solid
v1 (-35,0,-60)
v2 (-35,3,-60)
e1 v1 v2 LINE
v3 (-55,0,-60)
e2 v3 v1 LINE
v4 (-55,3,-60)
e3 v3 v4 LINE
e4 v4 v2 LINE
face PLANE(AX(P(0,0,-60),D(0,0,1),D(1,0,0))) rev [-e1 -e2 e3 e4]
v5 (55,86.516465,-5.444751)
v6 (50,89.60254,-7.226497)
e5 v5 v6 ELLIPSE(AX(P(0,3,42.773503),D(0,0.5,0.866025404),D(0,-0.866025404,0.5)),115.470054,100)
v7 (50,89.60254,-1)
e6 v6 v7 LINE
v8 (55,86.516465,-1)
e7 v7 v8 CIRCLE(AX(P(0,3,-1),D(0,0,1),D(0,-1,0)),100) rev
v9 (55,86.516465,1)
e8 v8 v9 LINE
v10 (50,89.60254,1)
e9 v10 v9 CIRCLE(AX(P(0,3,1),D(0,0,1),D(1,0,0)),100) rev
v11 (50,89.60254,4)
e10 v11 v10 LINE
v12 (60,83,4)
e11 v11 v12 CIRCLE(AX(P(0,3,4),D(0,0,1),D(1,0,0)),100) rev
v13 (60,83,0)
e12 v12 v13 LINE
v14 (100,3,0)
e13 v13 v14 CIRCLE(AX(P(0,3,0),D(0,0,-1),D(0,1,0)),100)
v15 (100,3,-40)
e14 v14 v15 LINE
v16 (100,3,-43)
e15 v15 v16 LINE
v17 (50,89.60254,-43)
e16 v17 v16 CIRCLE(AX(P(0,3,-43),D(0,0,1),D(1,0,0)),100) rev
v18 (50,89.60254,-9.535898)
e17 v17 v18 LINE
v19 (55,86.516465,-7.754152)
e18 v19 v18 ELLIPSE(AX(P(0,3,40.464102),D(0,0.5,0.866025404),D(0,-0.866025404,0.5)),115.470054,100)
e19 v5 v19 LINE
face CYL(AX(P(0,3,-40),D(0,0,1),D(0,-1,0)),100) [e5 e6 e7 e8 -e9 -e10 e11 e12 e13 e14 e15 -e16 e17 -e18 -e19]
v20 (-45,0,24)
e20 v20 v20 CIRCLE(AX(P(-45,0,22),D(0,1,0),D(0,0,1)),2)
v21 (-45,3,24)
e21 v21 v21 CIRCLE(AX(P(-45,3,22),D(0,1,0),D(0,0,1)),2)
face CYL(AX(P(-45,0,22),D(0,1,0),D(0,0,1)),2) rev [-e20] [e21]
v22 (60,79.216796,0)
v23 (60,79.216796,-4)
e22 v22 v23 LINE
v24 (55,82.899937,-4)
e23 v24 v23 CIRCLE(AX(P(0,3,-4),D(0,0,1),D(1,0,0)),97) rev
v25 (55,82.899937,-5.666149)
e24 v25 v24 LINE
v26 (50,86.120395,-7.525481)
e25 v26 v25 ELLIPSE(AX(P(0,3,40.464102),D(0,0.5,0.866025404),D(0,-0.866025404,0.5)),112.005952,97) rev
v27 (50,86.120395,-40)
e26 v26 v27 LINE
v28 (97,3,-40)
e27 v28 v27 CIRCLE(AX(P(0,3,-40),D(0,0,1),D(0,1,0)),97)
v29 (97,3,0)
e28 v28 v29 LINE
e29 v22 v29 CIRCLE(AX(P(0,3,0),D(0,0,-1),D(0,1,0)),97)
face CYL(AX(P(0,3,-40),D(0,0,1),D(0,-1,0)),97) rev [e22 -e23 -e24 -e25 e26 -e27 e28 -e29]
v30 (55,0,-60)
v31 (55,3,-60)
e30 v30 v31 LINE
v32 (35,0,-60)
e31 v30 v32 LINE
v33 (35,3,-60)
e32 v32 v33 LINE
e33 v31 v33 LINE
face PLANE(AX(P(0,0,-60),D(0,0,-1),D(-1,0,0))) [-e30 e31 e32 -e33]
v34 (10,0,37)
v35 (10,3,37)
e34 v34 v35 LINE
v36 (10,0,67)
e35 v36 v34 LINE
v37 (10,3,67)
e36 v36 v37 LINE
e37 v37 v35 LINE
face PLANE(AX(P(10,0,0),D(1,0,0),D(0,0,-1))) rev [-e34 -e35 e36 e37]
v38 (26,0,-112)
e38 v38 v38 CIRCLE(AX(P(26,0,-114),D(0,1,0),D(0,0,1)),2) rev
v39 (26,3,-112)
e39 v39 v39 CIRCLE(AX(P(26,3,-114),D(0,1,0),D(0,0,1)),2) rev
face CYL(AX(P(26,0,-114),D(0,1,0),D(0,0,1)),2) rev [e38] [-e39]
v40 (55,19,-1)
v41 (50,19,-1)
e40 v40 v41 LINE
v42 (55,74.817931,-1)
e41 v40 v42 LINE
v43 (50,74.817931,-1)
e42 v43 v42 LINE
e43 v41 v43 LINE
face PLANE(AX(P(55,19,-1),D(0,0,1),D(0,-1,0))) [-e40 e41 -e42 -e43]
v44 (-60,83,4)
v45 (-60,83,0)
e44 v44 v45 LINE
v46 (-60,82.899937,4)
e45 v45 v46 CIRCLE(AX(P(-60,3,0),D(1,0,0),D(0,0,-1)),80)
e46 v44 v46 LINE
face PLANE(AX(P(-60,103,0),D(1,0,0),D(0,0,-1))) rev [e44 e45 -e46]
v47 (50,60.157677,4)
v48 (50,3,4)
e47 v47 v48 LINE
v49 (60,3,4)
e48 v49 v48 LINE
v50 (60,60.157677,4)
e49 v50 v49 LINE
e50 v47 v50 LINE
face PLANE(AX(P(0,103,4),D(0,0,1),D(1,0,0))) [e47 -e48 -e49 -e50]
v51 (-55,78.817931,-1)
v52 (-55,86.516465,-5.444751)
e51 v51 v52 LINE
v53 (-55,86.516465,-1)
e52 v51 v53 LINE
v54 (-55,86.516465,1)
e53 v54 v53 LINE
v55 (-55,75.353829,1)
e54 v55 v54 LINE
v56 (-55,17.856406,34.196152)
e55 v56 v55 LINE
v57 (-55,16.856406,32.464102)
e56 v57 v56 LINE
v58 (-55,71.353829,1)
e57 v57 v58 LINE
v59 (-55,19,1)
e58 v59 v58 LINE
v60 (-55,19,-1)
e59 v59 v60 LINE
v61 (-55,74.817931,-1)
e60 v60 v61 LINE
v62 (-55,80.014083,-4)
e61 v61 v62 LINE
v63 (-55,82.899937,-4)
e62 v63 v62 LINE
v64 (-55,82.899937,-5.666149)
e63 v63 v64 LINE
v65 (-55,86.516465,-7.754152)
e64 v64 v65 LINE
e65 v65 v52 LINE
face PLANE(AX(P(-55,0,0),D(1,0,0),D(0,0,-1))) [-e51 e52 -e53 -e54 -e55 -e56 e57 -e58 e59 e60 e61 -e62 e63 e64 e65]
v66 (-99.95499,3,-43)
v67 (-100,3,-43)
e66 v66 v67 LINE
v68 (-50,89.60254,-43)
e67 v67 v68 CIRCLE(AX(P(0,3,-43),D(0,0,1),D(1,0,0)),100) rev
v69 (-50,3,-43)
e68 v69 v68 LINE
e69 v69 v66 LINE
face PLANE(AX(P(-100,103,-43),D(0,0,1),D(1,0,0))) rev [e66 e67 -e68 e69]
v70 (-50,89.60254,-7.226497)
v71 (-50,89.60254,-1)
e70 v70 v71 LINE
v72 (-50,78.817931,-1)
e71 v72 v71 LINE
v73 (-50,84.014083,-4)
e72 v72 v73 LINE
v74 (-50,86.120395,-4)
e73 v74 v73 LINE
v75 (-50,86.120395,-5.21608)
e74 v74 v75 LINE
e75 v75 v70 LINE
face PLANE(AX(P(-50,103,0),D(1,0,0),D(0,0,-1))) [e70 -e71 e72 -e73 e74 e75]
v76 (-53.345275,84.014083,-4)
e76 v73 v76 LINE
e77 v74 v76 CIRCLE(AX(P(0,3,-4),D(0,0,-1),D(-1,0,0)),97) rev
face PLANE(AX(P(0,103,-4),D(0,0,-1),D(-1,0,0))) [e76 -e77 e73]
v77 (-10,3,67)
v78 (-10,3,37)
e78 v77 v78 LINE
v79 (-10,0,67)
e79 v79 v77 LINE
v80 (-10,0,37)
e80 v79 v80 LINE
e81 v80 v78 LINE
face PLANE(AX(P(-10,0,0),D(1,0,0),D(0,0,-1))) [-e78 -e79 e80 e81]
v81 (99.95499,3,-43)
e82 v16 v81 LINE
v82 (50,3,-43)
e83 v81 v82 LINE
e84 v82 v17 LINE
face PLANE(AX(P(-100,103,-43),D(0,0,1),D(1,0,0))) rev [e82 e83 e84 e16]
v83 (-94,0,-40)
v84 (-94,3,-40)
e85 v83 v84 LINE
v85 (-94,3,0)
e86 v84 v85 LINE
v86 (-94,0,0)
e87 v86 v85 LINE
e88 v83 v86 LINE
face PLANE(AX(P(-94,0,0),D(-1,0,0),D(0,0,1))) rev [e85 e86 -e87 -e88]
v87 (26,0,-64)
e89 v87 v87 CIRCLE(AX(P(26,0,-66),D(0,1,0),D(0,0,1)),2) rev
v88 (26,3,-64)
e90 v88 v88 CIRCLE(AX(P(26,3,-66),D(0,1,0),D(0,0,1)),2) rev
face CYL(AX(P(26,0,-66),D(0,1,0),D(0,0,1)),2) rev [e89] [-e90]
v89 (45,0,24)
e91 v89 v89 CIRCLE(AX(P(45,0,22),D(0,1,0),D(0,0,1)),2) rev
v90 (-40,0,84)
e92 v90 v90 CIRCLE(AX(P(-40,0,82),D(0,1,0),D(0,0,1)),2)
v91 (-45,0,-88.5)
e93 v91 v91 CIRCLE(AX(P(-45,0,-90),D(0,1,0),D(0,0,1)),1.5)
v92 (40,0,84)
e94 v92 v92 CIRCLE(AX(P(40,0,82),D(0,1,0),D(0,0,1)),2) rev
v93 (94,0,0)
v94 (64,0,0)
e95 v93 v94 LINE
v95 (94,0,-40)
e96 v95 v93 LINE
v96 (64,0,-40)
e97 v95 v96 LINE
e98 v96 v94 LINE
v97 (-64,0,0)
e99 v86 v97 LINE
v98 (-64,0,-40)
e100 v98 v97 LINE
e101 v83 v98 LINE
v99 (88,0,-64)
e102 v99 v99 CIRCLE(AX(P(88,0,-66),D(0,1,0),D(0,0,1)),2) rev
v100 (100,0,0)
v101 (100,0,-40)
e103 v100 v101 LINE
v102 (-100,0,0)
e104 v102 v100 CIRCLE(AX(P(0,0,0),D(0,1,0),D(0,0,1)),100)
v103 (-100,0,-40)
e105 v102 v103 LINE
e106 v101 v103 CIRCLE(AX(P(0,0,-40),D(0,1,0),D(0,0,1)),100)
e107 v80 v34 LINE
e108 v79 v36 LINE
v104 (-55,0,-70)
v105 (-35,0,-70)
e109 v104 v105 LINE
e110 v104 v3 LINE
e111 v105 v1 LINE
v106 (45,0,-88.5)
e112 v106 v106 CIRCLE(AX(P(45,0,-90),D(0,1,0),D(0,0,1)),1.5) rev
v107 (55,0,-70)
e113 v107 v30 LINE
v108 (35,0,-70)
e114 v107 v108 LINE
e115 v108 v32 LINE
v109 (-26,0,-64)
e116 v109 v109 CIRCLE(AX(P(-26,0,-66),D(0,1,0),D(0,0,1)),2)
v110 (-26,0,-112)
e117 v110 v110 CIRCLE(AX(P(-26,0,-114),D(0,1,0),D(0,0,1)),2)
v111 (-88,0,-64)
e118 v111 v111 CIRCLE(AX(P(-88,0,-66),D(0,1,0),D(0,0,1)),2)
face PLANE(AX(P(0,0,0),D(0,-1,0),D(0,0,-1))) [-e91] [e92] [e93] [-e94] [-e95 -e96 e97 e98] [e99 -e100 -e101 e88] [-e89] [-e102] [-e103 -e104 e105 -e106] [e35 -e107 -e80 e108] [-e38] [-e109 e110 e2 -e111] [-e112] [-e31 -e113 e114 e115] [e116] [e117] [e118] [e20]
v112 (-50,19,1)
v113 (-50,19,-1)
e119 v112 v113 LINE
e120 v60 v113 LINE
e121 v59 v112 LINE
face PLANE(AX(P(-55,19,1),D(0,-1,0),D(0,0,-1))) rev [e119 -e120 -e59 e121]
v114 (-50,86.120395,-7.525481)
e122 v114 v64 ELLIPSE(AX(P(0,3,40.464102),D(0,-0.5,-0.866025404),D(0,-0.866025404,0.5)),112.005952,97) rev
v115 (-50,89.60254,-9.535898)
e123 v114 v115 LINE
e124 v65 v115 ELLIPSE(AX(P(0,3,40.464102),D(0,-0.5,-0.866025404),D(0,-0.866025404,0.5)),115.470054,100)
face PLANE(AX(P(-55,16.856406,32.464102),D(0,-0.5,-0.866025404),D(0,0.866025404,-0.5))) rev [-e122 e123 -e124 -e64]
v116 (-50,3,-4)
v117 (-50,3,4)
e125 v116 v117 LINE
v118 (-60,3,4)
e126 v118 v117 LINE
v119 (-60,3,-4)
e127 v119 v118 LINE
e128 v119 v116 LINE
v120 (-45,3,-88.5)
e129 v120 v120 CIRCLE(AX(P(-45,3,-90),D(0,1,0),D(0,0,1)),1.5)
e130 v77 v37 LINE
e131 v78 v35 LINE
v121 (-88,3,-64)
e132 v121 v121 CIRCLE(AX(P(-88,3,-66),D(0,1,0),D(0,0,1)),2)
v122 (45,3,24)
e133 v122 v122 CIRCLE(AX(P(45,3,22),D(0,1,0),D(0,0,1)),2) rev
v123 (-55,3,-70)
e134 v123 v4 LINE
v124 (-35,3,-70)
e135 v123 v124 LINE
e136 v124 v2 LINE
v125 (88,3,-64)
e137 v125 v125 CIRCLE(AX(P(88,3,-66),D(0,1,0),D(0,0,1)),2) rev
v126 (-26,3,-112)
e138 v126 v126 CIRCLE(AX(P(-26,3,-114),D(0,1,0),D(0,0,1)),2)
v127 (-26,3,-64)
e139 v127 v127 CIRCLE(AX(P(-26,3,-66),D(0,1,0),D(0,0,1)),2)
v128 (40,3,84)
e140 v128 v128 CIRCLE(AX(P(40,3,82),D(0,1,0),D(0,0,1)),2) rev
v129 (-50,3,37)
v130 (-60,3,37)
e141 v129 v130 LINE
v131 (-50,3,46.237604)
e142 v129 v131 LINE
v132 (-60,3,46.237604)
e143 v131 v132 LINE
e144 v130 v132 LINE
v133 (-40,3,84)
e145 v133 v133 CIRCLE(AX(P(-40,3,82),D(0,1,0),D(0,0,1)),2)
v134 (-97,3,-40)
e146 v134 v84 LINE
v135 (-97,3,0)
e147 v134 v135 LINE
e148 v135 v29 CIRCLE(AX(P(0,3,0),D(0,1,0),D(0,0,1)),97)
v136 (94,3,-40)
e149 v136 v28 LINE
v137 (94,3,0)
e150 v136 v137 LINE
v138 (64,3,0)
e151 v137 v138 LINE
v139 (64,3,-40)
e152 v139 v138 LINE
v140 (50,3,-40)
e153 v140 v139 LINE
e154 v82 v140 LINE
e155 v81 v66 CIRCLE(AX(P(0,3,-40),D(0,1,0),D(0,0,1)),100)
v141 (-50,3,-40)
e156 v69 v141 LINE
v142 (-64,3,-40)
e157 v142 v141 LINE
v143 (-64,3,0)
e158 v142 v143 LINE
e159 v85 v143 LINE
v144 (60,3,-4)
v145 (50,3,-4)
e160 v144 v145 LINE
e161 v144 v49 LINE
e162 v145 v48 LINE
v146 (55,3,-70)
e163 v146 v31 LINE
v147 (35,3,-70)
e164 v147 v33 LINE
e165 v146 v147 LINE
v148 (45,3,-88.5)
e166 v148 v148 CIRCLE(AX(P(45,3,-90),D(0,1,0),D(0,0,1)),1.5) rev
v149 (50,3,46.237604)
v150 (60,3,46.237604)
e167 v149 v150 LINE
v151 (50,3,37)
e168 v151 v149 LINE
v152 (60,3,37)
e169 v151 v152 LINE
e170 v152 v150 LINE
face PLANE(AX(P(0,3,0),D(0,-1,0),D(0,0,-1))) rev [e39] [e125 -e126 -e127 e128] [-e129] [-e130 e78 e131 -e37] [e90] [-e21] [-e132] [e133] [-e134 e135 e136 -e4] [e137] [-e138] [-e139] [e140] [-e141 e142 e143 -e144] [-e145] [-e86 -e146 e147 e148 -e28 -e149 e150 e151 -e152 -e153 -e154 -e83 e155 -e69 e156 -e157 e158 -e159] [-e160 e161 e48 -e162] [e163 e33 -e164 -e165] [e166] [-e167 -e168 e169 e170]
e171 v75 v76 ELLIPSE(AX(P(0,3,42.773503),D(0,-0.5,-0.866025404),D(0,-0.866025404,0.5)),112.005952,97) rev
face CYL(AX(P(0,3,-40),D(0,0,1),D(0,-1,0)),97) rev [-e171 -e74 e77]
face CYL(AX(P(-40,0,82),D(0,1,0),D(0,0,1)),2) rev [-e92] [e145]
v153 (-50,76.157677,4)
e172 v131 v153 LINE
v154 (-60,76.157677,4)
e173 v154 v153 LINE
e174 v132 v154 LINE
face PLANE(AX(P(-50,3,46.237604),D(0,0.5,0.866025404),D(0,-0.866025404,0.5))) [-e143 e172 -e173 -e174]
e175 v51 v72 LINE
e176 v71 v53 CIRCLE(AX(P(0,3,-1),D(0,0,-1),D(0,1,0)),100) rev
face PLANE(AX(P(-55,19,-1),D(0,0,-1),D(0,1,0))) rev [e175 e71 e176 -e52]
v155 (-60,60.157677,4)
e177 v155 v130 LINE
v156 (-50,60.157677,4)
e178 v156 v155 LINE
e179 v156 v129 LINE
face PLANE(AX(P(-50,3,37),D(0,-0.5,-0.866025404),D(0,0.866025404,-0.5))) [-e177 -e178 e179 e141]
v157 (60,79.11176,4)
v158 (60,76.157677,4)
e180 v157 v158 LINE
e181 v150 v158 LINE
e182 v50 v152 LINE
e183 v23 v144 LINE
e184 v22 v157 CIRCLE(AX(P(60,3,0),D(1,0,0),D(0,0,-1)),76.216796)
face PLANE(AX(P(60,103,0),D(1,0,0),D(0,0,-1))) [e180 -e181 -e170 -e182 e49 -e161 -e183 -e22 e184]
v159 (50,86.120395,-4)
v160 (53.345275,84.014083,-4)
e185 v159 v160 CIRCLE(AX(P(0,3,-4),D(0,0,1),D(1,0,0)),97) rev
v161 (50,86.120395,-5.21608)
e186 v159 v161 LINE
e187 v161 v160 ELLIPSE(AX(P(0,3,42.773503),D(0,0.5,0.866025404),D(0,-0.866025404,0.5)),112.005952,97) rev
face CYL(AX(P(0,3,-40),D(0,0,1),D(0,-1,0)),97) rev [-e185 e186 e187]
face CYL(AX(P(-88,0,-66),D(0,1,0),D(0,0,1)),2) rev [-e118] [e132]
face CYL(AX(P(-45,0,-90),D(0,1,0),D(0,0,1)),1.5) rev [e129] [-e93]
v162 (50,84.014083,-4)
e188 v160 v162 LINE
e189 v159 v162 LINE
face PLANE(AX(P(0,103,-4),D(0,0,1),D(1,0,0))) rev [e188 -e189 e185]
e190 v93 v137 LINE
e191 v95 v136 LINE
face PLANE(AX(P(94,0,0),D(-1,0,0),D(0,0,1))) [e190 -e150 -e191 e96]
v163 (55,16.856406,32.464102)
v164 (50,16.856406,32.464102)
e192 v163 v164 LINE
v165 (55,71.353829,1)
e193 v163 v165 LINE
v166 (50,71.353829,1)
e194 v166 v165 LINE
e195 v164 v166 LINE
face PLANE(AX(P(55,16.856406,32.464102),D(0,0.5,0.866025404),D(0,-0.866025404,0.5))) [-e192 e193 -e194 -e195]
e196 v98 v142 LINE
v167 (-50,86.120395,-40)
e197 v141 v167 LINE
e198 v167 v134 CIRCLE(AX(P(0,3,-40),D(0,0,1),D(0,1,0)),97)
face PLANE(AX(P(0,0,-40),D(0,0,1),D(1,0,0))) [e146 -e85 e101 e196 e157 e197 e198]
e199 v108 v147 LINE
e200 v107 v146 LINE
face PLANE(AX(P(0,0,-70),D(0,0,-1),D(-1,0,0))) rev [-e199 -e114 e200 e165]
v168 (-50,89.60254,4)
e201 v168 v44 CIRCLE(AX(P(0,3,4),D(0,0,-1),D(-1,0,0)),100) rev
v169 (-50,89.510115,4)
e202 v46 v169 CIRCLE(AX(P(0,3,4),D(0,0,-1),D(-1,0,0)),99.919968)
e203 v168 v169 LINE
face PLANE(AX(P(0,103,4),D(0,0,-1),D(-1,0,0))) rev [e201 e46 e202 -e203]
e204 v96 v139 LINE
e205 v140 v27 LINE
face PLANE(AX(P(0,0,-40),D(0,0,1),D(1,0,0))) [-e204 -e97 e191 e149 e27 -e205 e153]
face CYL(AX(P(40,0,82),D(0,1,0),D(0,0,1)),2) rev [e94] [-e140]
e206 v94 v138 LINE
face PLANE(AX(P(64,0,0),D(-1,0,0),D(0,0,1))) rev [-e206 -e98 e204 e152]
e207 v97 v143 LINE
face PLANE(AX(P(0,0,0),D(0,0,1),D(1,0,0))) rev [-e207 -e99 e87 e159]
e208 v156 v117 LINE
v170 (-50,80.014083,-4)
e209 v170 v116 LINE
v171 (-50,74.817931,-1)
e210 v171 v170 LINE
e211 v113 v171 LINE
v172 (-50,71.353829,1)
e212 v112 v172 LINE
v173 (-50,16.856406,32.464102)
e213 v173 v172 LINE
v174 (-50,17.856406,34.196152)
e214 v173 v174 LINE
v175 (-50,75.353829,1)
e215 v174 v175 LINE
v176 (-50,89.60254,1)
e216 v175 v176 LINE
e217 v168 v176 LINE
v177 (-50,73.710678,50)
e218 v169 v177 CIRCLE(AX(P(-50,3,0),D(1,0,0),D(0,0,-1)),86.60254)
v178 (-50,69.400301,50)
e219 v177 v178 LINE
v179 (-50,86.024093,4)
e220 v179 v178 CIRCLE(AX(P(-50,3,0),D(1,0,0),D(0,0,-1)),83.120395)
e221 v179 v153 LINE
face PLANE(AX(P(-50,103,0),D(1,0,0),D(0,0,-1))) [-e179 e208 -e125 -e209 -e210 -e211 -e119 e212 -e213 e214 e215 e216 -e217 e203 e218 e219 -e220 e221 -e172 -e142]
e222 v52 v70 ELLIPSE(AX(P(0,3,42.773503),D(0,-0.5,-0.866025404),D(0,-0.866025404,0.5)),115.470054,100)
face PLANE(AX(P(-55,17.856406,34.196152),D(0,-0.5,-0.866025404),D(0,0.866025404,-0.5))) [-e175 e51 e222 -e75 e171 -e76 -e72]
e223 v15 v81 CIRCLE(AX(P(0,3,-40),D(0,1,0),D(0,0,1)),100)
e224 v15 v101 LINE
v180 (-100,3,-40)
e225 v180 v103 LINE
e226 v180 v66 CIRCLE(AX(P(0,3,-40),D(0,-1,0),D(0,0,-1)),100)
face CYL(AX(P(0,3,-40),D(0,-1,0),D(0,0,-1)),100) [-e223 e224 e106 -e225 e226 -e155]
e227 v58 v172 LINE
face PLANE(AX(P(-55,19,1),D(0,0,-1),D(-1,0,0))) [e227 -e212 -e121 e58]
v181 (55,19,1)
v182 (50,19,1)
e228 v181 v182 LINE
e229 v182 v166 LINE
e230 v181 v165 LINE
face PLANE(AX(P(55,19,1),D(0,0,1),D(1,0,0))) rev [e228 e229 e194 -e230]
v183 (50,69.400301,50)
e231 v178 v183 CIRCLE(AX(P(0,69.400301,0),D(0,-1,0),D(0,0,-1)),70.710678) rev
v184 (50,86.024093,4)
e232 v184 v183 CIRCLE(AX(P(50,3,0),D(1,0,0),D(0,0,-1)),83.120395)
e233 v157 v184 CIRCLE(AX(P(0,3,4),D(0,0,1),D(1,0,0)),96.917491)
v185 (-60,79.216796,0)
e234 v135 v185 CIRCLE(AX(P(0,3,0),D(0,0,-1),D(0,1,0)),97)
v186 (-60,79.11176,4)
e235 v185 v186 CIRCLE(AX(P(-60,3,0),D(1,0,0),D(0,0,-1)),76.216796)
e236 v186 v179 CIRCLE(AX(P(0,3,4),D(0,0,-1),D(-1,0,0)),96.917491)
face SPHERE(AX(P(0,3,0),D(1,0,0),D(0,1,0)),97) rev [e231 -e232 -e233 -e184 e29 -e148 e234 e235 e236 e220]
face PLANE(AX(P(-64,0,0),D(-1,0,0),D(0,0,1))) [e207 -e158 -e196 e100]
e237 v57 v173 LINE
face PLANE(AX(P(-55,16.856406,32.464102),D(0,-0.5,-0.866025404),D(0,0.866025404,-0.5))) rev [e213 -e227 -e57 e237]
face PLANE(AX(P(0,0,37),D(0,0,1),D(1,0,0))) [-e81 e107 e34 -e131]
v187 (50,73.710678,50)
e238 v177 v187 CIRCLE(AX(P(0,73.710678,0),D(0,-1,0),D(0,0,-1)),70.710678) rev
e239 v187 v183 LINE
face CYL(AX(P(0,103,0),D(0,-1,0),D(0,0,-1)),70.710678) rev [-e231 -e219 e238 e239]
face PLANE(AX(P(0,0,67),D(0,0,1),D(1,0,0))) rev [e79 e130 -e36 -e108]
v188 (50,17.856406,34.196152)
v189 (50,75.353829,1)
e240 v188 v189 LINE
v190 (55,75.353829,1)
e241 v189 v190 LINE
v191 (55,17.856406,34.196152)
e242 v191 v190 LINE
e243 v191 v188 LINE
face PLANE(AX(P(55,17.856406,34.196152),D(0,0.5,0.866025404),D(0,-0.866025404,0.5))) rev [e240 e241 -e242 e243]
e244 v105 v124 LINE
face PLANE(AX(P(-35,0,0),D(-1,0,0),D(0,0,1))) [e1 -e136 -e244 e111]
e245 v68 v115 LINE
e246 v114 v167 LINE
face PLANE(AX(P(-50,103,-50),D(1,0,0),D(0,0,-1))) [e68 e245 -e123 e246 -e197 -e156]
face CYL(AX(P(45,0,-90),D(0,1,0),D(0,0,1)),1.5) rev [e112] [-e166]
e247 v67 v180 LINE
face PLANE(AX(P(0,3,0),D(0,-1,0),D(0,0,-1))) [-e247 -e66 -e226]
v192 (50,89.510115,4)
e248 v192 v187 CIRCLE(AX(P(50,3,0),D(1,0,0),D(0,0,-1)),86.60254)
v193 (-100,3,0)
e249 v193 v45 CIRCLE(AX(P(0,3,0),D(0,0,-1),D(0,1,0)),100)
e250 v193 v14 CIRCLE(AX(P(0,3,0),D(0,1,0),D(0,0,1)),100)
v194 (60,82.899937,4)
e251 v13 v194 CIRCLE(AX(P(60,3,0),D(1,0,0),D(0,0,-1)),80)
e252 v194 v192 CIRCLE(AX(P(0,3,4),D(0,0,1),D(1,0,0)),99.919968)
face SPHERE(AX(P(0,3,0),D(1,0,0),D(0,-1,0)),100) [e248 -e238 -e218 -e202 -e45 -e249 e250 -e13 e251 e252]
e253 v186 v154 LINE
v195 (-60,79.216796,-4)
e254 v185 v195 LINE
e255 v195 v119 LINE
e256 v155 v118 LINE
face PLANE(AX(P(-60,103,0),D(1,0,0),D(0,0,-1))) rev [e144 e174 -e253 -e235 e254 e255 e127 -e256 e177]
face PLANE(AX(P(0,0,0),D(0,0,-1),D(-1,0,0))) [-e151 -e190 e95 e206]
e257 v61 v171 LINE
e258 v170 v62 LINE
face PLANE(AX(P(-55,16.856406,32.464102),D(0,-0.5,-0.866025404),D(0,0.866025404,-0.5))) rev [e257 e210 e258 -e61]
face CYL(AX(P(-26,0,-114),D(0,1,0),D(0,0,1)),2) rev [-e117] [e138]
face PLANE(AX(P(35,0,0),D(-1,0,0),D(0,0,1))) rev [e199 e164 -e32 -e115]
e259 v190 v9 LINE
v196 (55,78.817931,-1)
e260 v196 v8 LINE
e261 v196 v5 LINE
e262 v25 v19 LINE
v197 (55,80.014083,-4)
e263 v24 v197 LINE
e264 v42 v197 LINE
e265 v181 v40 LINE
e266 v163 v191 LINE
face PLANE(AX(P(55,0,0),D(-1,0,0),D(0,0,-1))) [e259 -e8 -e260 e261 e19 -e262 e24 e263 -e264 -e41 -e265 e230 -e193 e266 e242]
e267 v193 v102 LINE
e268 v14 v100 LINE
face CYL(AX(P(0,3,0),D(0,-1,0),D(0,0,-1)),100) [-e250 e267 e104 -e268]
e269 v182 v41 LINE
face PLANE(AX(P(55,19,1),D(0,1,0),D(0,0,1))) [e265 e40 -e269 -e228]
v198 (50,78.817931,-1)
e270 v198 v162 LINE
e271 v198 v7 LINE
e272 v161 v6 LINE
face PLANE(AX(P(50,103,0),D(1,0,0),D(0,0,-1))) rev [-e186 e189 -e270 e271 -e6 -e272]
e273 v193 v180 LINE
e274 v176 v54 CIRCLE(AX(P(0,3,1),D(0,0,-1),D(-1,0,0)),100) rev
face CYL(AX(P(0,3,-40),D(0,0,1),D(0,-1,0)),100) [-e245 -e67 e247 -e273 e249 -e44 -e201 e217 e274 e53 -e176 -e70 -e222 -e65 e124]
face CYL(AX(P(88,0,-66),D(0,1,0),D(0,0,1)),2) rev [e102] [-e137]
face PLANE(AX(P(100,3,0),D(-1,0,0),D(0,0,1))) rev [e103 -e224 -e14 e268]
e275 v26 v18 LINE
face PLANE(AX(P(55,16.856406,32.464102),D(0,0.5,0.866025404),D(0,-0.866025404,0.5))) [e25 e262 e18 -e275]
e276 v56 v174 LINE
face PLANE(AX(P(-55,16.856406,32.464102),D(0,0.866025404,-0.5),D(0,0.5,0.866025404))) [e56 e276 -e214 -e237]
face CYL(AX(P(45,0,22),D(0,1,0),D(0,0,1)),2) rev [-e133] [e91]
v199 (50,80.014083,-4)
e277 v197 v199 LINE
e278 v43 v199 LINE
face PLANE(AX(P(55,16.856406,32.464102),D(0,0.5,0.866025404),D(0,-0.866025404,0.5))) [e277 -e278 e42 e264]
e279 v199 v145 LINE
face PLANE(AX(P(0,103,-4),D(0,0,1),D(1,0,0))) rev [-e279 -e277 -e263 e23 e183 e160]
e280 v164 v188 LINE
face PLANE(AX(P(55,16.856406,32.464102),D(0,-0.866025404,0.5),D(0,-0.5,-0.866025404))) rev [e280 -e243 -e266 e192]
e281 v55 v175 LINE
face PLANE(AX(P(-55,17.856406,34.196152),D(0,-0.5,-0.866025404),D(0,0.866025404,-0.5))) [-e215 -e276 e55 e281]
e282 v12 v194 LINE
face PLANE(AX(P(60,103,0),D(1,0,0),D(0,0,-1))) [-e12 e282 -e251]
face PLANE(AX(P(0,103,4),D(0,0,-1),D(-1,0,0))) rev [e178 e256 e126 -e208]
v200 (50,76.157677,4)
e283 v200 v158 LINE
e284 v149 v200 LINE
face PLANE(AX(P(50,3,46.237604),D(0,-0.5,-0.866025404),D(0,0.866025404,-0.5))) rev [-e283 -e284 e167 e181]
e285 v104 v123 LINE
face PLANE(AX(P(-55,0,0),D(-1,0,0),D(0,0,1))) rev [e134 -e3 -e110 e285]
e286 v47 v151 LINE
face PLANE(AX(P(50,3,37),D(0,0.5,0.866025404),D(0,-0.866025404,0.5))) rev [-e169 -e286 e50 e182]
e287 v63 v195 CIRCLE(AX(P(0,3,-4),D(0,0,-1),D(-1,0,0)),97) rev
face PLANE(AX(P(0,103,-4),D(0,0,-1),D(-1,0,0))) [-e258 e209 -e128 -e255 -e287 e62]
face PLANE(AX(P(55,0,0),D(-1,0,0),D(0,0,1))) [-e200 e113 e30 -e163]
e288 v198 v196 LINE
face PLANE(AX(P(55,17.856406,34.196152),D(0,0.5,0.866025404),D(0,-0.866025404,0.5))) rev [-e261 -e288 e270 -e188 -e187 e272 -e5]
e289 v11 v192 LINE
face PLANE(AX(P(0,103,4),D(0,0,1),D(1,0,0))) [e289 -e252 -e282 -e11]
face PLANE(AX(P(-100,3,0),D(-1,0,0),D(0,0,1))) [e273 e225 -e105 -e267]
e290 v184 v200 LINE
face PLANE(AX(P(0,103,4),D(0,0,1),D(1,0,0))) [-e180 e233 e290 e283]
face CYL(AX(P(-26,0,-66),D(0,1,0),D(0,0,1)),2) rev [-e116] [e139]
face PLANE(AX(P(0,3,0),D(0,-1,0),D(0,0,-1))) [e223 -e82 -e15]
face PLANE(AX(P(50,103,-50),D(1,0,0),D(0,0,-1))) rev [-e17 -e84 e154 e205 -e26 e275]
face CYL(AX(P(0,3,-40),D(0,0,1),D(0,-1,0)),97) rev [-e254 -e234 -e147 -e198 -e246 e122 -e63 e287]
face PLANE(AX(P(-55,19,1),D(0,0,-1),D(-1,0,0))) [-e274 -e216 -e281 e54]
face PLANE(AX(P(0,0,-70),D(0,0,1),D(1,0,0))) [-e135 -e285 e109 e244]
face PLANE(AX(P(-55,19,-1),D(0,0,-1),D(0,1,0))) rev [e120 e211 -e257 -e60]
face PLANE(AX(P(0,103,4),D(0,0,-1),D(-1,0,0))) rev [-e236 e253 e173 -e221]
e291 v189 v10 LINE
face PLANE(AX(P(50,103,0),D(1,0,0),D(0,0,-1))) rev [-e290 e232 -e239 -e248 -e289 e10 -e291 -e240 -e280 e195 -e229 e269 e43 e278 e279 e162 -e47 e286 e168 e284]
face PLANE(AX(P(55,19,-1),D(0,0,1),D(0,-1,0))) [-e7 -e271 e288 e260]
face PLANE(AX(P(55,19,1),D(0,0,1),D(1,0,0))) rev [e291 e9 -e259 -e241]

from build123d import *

# Parameters (mm, degrees)
SKETCH_1_R                  = 100
SKETCH_1_W                  = 200
SKETCH_1_H                  = 40
EXTRUDE_524_DEPTH           = 3
SKETCH_3_W                  = 30
SKETCH_3_H                  = 40
SKETCH_3_W_2                = 20
SKETCH_3_H_2                = 10
SKETCH_3_H_3                = 30
CUT_EXTRUDE_1393_DEPTH      = 3
SKETCH_2_R                  = 2
SKETCH_2_R_2                = 1.5
CUT_EXTRUDE_2567_DEPTH      = 173.072659072
REVOLVE_3158_ANGLE          = 90
EXTRUDE_3359_DEPTH          = 40
SKETCH_8_W                  = 10
SKETCH_8_H                  = 8
EXTRUDE_L_DEPTH             = 100
EXTRUDE_L_32_DEPTH          = 10
SKETCH_16_W                 = 2
SKETCH_16_H                 = 84
CUT_EXTRUDE_L_DEPTH         = 5
SKETCH_23_W                 = 200
SKETCH_23_H                 = 3
EXTRUDE_5603_DEPTH          = 100
CUT_EXTRUDE_5983_DEPTH      = 100
CUT_EXTRUDE_5983_DEPTH_BACK = 100
CUT_EXTRUDE_6828_DEPTH      = 100


with BuildPart() as part:
    # 草图1 → Extrude 524 (new body)
    with BuildSketch(Plane(origin=(0, 0, 0), x_dir=(1, 0, 0), z_dir=(0, 1, 0))):
        Circle(SKETCH_1_R)
        with Locations((0, 40)):
            Circle(SKETCH_1_R)
        with Locations((0, 20)):
            Rectangle(SKETCH_1_W, SKETCH_1_H)
    extrude(amount=EXTRUDE_524_DEPTH)

    # 草图3 → Cut-Extrude 1393 (cut)
    with BuildSketch(Plane(origin=(0, 3, 0), x_dir=(1, 0, 0), z_dir=(0, 1, 0))):
        with Locations((-79, 20)):
            Rectangle(SKETCH_3_W, SKETCH_3_H)
        with Locations((79, 20)):
            Rectangle(SKETCH_3_W, SKETCH_3_H)
        with Locations((45, 65)):
            Rectangle(SKETCH_3_W_2, SKETCH_3_H_2)
        with Locations((0, -52)):
            Rectangle(SKETCH_3_W_2, SKETCH_3_H_3)
        with Locations((-45, 65)):
            Rectangle(SKETCH_3_W_2, SKETCH_3_H_2)
    extrude(amount=-CUT_EXTRUDE_1393_DEPTH, mode=Mode.SUBTRACT)

    # 草图2 → Cut-Extrude 2567 (cut, through all)
    with BuildSketch(Plane(origin=(0, 3, 0), x_dir=(1, 0, 0), z_dir=(0, 1, 0))):
        with Locations((-45, -22)):
            Circle(SKETCH_2_R)
        with Locations((-40, -82)):
            Circle(SKETCH_2_R)
        with Locations((-88, 66)):
            Circle(SKETCH_2_R)
        with Locations((-26, 66)):
            Circle(SKETCH_2_R)
        with Locations((-26, 114)):
            Circle(SKETCH_2_R)
        with Locations((40, -82)):
            Circle(SKETCH_2_R)
        with Locations((45, -22)):
            Circle(SKETCH_2_R)
        with Locations((26, 114)):
            Circle(SKETCH_2_R)
        with Locations((26, 66)):
            Circle(SKETCH_2_R)
        with Locations((88, 66)):
            Circle(SKETCH_2_R)
        with Locations((-45, 90)):
            Circle(SKETCH_2_R_2)
        with Locations((45, 90)):
            Circle(SKETCH_2_R_2)
    extrude(amount=-CUT_EXTRUDE_2567_DEPTH, mode=Mode.SUBTRACT)

    # 草图18 → Revolve 3158 (revolve)
    with BuildSketch(Plane(origin=(0, 3, 0), x_dir=(1, 0, 0), z_dir=(0, 1, 0))):
        with BuildLine():
            Line((-97, 0), (-100, 0))
            ThreePointArc((-100, 0), (0, -100), (100, 0))
            Line((100, 0), (97, 0))
            ThreePointArc((97, 0), (0, -97), (-97, 0))
        make_face()
    revolve(axis=Axis((-100, 3, 0), (-1, 0, 0)), revolution_arc=REVOLVE_3158_ANGLE)

    # 草图19 → Extrude 3359 (add)
    with BuildSketch(Plane(origin=(0, 0, 0), x_dir=(-1, 0, 0), z_dir=(0, 0, -1))):
        with BuildLine():
            Line((97, 3), (100, 3))
            ThreePointArc((100, 3), (0, 103), (-100, 3))
            Line((-100, 3), (-97, 3))
            ThreePointArc((-97, 3), (0, 100), (97, 3))
        make_face()
    extrude(amount=EXTRUDE_3359_DEPTH)

    # 草图8 → 安装架-L-树莓派 (add)
    with BuildSketch(Plane(origin=(0, 3, 0), x_dir=(1, 0, 0), z_dir=(0, 1, 0))):
        with Locations((-55, 0)):
            Rectangle(SKETCH_8_W, SKETCH_8_H)
    extrude_l = extrude(amount=EXTRUDE_L_DEPTH)

    # 草图11 → 安装架-L-32 (add)
    with BuildSketch(Plane.ZY.offset(60)):
        Polygon((37, 3), (4, 60.15767665), (3.758069686, 76.576712245), (46.237604307, 3), align=None)
    extrude_l_32 = extrude(amount=-EXTRUDE_L_32_DEPTH)

    # 草图16 → 安装架-L-凹槽 (cut)
    with BuildSketch(Plane(origin=(-50, 0, 0), x_dir=(0, 0, -1), z_dir=(1, 0, 0))):
        Polygon((-32.464101615, 16.856406461), (-34.196152423, 17.856406461), (15.803847577, 104.458946839), (17.535898385, 103.458946839), align=None)
        with Locations((0, 61)):
            Rectangle(SKETCH_16_W, SKETCH_16_H)
    cut_extrude_l = extrude(amount=-CUT_EXTRUDE_L_DEPTH, mode=Mode.SUBTRACT)

    # 安装架-R: 安装架-L-树莓派, 安装架-L-32, 安装架-L-凹槽 across plane
    add(extrude_l.mirror(Plane(origin=(0, 0, 0), x_dir=(0, 0, 1), z_dir=(1, 0, 0))))
    add(extrude_l_32.mirror(Plane(origin=(0, 0, 0), x_dir=(0, 0, 1), z_dir=(1, 0, 0))))
    add(cut_extrude_l.mirror(Plane(origin=(0, 0, 0), x_dir=(0, 0, 1), z_dir=(1, 0, 0))), mode=Mode.SUBTRACT)

    # 草图23 → Extrude 5603 (add)
    with BuildSketch(Plane(origin=(0, 3, 0), x_dir=(1, 0, 0), z_dir=(0, 1, 0))):
        with Locations((0, 41.5)):
            Rectangle(SKETCH_23_W, SKETCH_23_H)
    extrude(amount=EXTRUDE_5603_DEPTH)

    # 草图24 → Cut-Extrude 5983 (cut, two sides: drawn at the far end of the back side and taken through both)
    with BuildSketch(Plane.XY.offset(-40).offset(-CUT_EXTRUDE_5983_DEPTH_BACK)):
        with BuildLine():
            Line((-150, 3), (-100, 3))
            ThreePointArc((-100, 3), (0, 103), (100, 3))
            Line((100, 3), (150, 3))
            ThreePointArc((150, 3), (0, 153), (-150, 3))
        make_face()
    extrude(amount=CUT_EXTRUDE_5983_DEPTH + CUT_EXTRUDE_5983_DEPTH_BACK, mode=Mode.SUBTRACT)

    # 草图21 → Cut-Extrude 6828 (cut)
    with BuildSketch(Plane(origin=(0, 3, 0), x_dir=(1, 0, 0), z_dir=(0, 1, 0))):
        with BuildLine():
            Line((50, -50), (50, 50))
            Line((50, 50), (-50, 50))
            Line((-50, 50), (-50, -50))
            ThreePointArc((-50, -50), (0, -70.710678119), (50, -50))
        make_face()
    extrude(amount=CUT_EXTRUDE_6828_DEPTH, mode=Mode.SUBTRACT)


solid = part.part
